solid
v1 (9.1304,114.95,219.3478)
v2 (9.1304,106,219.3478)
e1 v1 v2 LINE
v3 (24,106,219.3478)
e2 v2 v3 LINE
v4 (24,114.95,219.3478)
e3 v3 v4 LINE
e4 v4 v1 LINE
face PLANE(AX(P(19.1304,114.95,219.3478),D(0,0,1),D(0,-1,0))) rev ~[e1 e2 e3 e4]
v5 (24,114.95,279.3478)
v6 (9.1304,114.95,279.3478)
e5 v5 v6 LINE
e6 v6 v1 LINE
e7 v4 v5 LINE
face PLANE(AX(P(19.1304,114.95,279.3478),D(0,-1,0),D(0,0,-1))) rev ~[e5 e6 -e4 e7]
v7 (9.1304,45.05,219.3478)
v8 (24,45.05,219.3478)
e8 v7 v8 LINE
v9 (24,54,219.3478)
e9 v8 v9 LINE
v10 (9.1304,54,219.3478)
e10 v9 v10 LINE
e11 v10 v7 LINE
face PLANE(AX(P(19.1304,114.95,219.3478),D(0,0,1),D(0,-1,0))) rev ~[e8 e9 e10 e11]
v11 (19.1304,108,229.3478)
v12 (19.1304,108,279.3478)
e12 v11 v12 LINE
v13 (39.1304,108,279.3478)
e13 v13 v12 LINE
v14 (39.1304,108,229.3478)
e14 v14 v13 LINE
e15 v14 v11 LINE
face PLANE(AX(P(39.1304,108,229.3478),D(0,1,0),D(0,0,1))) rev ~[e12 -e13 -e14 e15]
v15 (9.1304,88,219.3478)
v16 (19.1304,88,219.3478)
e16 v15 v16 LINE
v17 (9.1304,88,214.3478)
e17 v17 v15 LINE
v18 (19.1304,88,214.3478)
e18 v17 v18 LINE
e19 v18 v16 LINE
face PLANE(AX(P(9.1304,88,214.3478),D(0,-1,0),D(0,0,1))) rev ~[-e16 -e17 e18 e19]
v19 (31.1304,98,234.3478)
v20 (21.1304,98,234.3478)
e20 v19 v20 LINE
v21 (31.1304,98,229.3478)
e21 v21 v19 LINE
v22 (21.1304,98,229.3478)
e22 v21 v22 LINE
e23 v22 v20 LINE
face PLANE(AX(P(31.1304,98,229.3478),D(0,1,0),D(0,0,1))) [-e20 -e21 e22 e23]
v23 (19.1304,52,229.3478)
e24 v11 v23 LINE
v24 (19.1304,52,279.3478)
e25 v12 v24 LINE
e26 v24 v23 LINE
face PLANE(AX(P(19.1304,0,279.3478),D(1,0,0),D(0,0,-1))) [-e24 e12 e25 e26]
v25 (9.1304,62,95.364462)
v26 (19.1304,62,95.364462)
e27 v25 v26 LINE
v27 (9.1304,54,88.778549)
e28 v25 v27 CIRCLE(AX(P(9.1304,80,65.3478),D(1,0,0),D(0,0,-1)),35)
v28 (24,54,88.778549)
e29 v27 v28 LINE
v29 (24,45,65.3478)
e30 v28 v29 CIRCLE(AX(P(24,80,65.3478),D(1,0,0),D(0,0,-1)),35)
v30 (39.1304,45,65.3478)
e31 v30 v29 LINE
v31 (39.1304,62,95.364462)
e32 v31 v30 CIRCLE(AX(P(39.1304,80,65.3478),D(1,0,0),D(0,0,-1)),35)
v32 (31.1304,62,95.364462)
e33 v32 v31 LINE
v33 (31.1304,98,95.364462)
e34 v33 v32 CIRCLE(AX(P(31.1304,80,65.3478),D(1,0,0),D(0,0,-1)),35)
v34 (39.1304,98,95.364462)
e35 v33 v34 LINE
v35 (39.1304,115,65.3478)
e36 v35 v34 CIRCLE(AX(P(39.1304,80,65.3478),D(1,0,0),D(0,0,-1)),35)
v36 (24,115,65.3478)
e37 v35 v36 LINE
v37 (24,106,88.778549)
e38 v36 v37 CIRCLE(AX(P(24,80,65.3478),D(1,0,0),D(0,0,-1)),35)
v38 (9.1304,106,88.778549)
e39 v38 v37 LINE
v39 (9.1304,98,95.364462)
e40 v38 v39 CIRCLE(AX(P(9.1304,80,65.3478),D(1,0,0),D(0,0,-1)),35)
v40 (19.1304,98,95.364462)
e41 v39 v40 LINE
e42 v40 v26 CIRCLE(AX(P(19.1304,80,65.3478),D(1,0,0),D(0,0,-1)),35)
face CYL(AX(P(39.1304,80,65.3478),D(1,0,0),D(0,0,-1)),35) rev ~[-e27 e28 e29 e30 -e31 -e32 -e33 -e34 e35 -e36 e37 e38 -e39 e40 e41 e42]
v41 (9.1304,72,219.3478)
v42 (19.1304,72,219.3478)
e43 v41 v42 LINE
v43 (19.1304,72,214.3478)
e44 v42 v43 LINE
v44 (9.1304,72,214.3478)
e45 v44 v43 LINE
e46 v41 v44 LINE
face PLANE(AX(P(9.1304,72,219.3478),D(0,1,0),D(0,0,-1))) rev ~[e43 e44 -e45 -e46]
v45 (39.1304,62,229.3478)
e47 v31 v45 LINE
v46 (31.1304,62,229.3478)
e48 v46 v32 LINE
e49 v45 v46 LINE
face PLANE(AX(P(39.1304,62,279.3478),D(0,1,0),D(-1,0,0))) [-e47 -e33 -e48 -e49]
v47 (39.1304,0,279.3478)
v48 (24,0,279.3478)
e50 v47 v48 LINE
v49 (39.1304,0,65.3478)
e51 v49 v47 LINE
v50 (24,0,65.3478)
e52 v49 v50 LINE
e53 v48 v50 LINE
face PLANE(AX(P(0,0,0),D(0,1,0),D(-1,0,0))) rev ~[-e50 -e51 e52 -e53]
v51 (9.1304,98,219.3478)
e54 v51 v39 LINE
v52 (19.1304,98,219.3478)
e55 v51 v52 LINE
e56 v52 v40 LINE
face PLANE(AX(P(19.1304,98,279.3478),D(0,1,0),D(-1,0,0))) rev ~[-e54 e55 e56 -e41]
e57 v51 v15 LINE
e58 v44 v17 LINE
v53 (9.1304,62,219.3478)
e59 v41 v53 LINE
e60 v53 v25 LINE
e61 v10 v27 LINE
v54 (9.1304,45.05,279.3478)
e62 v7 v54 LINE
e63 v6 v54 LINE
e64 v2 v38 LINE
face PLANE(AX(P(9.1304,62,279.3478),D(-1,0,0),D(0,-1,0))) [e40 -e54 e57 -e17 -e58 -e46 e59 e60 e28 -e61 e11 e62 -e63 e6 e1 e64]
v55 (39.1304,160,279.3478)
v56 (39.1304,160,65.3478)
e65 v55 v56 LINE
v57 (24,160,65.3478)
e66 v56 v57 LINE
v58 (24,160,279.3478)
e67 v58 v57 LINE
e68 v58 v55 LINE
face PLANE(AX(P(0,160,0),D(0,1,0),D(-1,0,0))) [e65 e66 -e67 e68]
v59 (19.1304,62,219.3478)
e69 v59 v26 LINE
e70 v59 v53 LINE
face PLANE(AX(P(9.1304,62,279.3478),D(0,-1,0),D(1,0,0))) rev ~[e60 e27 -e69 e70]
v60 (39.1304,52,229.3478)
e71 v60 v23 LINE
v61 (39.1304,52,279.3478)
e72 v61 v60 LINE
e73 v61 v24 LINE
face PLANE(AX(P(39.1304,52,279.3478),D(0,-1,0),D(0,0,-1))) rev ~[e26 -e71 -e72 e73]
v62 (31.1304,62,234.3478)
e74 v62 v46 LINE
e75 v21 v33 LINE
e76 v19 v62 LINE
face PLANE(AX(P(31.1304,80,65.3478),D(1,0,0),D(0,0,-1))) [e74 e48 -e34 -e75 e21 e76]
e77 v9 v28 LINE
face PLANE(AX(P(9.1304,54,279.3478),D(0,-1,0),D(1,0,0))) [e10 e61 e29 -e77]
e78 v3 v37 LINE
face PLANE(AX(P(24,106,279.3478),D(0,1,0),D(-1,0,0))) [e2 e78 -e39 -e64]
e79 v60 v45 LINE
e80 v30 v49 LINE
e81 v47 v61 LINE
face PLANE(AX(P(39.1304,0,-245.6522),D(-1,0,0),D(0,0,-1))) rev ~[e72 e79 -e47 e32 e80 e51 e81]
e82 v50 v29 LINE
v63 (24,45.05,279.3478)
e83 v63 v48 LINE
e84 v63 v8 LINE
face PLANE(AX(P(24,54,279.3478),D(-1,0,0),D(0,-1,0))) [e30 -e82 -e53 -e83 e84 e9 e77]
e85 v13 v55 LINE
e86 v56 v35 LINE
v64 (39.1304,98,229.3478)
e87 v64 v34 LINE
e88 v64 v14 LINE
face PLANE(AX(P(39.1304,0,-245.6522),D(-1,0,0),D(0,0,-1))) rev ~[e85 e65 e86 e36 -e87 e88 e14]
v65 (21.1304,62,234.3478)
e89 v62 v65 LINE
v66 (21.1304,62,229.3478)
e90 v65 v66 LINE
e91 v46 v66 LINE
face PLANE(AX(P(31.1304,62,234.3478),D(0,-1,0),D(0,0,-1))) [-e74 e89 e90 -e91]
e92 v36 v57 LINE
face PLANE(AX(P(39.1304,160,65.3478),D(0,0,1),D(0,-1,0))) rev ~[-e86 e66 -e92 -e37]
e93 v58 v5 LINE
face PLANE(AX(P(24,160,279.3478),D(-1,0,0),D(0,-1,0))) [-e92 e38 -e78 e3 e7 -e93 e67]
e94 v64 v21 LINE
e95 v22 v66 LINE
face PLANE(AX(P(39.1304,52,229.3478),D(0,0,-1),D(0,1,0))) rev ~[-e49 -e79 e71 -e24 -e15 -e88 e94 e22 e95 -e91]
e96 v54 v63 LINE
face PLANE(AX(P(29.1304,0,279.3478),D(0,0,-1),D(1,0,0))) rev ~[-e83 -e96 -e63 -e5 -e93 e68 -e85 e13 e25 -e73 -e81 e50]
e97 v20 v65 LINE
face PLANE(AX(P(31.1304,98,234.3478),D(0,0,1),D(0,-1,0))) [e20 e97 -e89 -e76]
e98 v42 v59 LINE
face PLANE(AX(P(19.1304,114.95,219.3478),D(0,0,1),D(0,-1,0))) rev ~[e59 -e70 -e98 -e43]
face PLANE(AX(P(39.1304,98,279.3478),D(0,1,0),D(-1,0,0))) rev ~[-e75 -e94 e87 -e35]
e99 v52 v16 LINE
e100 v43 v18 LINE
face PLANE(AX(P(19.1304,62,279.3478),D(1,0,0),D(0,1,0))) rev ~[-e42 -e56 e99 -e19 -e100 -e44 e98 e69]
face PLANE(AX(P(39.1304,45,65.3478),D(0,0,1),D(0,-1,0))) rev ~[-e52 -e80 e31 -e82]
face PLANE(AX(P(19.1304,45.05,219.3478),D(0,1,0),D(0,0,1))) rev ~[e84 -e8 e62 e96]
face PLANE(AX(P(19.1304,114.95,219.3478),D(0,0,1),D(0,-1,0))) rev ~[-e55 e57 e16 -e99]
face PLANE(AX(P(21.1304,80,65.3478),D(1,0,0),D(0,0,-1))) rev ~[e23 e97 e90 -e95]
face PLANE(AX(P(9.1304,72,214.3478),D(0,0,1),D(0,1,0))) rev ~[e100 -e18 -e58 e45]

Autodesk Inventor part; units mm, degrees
ref_plane "YZ Plane" through (0, 0, 0) normal (1, 0, 0) x (0, 1, 0)
ref_plane "XZ Plane" through (0, 0, 0) normal (0, 1, 0) x (-1, 0, 0)
ref_plane "XY Plane" through (0, 0, 0) normal (0, 0, 1) x (1, 0, 0)
sketch "Sketch1" plane through (0, 0, 0) normal (0, 1, 0) x (-1, 0, 0)
  line L0 (0, 279.3478) -> (-39.1304, 279.3478)
  line L1 (-39.1304, 279.3478) -> (-39.1304, -270.6522)
  line L2 (-39.1304, -270.6522) -> (0, -270.6522)
  line L3 (0, -270.6522) -> (0, 279.3478)
  line L4 (-39.1304, 279.3478) -> (-29.1304, 279.3478)
  line L5 (-29.1304, 254.3478) -> (-39.1304, 254.3478)
  line L6 (-39.1304, 254.3478) -> (-39.1304, 279.3478)
  line L7 (-39.1304, -270.6522) -> (-29.1304, -270.6522)
  line L8 (-29.1304, -245.6522) -> (-39.1304, -245.6522)
  line L9 (-39.1304, -245.6522) -> (-39.1304, -270.6522)
  point P0 (0, 0)
  point P1 (-39.1304, 254.3478)
  point P2 (-39.1304, -245.6522)
  dimension "d0" = 550
  dimension "d4" = 25
  dimension "d5" = 25
  dimension "d28" = 39.1304
extrude "Extrusion1" add sketch "Sketch1" along normal blind 160
sketch "Sketch2" plane through (0, 0, 279.3478) normal (0, 0, 1) x (1, 0, 0)
  line L0 (0, 160) -> (39.1304, 160) projected
  line L1 (0, 160) -> (39.1304, 160)
  line L2 (39.1304, 160) -> (39.1304, 0)
  line L3 (39.1304, 0) -> (0, 0)
  line L4 (0, 0) -> (0, 160)
  line L5 (39.1304, 160) -> (39.1304, 160)
  line L6 (39.1304, 160) -> (39.1304, 115)
  line L7 (39.1304, 115) -> (39.1304, 115)
  line L8 (39.1304, 115) -> (39.1304, 160)
  line L9 (39.1304, 0) -> (39.1304, 0)
  line L10 (39.1304, 0) -> (39.1304, 45)
  line L11 (39.1304, 45) -> (39.1304, 45)
  line L12 (39.1304, 45) -> (39.1304, 0)
  circle A0 centre (39.1304, 80) radius 18
  line L13 (31.1304, 75) -> (39.1304, 75)
  line L14 (39.1304, 75) -> (39.1304, 98)
  line L15 (39.1304, 98) -> (31.1304, 98)
  line L16 (31.1304, 98) -> (31.1304, 75)
  line L17 (31.1304, 75) -> (39.1304, 75)
  line L18 (39.1304, 75) -> (39.1304, 62)
  line L19 (39.1304, 62) -> (31.1304, 62)
  line L20 (31.1304, 62) -> (31.1304, 75)
  line L21 (39.1304, 0) -> (39.1304, 160) projected
  line L22 (0, 160) -> (9.1304, 160)
  line L23 (9.1304, 160) -> (9.1304, 0)
  line L24 (9.1304, 0) -> (0, 0)
  line L25 (0, 0) -> (0, 160)
  line L26 (19.1304, 98) -> (-11, 98)
  line L27 (-11, 98) -> (-11, 62)
  line L28 (-11, 62) -> (19.1304, 62)
  line L29 (19.1304, 62) -> (19.1304, 98)
  line L30 (-8, 54) -> (24, 54)
  line L31 (24, 54) -> (24, 0)
  line L32 (24, 0) -> (-8, 0)
  line L33 (-8, 0) -> (-8, 54)
  line L34 (-8, 160) -> (24, 160)
  line L35 (24, 160) -> (24, 106)
  line L36 (24, 106) -> (-8, 106)
  line L37 (-8, 106) -> (-8, 160)
  point P0 (0, 0)
  point P1 (39.1304, 115)
  point P2 (39.1304, 160)
  point P3 (39.1304, 45)
  point P4 (39.1304, 0)
  point P5 (39.1304, 115)
  point P6 (0, 98)
  point P7 (0, 62)
  point P8 (9.1304, 98)
  point P9 (9.1304, 106)
  point P10 (9.1304, 54)
  point P11 (9.1304, 62)
  dimension "d6" = 0
  dimension "d7" = 45
  dimension "d8" = 45
  dimension "d9" = 8
  dimension "d10" = 36
  dimension "d11" = 80
  dimension "d12" = 80
  dimension "d15" = 30
  dimension "d34" = 12
extrude "Extrusion2" cut sketch "Sketch2" against normal up to surface (550 mm away) contours L0 L23 L36 L4 | L0 L35 L36 L23 | L36 L23 L26 L4 | L26 L23 L28 L4 | L26 L29 L28 L23 | L28 L23 L30 L4 | L30 L23 L3 L4 | L2 L13 L16 A0 | A0 L16 L15 | L30 L31 L3 L23 | L2 A0 L20 L13 | L19 L20 A0
sketch "Sketch5" plane through (39.1304, 160, 279.3478) normal (1, 0, 0) x (0, 0, -1)
  line L0 (0, -62) -> (0, 0) projected
  line L1 (0, -160) -> (550, -160) projected
  line L2 (0, 0) -> (214, 0)
  line L3 (214, 0) -> (214, -160)
  line L4 (214, -160) -> (0, -160)
  line L5 (0, -160) -> (0, 0)
  circle A0 centre (214, -80) radius 35
  line L6 (214, 0) -> (550, 0)
  line L7 (550, 0) -> (550, -160)
  line L8 (550, -160) -> (214, -160)
  line L9 (214, -160) -> (214, 0)
  point P0 (279.3478, -160)
  point P1 (214, -45)
  point P2 (214, -115)
  dimension "d30" = 160
  dimension "d31" = 70
extrude "Extrusion4" cut sketch "Sketch5" against normal blind 100 contours L6 L7 L1 L3 A0 | A0 L3 | L3 A0
sketch "Sketch6" plane through (19.1304, 62, 279.3478) normal (-1, 0, 0) x (0, 0, 1)
  line L0 (0, 52.95) -> (-60, 52.95)
  line L1 (-60, 52.95) -> (-60, -16.95)
  line L2 (-60, -16.95) -> (0, -16.95)
  line L3 (0, -16.95) -> (0, 52.95)
  line L4 (0, -62) -> (-214, -62) projected
  line L5 (-214, 98) -> (0, 98) projected
  point P0 (-279.3478, -62)
  dimension "d43" = 45.05
  dimension "d44" = 45.05
  dimension "d45" = 60
extrude "Extrusion5" add sketch "Sketch6" along normal mid plane 20
sketch "Sketch7" plane through (24, 0, 279.3478) normal (0, 0, 1) x (1, 0, 0)
  point P0 (-24, 0)
sketch "Sketch8" plane through (39.1304, 0, 279.3478) normal (1, 0, 0) x (0, 0, -1)
  line L0 (0, 0) -> (0, 62) projected
  line L1 (0, 52) -> (50, 52)
  line L2 (50, 52) -> (50, 108)
  line L3 (50, 108) -> (0, 108)
  line L4 (0, 108) -> (0, 52)
  line L5 (183.9833, 62) -> (0, 62) projected
  line L6 (0, 98) -> (183.9833, 98) projected
  point P0 (279.3478, 0)
  dimension "d38" = 10
  dimension "d39" = 10
  dimension "d40" = 50
extrude "Extrusion6" cut sketch "Sketch8" against normal blind 20
sketch "Sketch9" plane through (31.1304, 80, 65.3478) normal (1, 0, 0) x (0, 0, -1)
  line L0 (-164, 18) -> (-164, -18) projected
  line L1 (-154, -18) -> (-30.0167, -18) projected
  line L2 (-164, 18) -> (-169, 18)
  line L3 (-169, 18) -> (-169, -18)
  line L4 (-169, -18) -> (-164, -18)
  line L5 (-164, -18) -> (-164, 18)
  point P0 (65.3478, -80)
  point P1 (-214, -18)
extrude "Extrusion7" add sketch "Sketch9" against normal blind 10
sketch "Sketch10" plane through (9.1304, 45.05, 279.3478) normal (-1, 0, 0) x (0, 0, 1)
  line L0 (-60, 52.95) -> (-60, 16.95) projected
  line L1 (-60, 26.95) -> (-65, 26.95)
  line L2 (-65, 26.95) -> (-65, 42.95)
  line L3 (-65, 42.95) -> (-60, 42.95)
  line L4 (-60, 42.95) -> (-60, 26.95)
  line L5 (-60, 16.95) -> (-183.9833, 16.95) projected
  line L6 (-60, 52.95) -> (-183.9833, 52.95) projected
  point P0 (-279.3478, -45.05)
  point P1 (-60, 42.95)
  dimension "d48" = 10
  dimension "d49" = 10
extrude "Extrusion8" add sketch "Sketch10" against normal blind 10
properties part number "MainRails" material "Aluminum 6061"
